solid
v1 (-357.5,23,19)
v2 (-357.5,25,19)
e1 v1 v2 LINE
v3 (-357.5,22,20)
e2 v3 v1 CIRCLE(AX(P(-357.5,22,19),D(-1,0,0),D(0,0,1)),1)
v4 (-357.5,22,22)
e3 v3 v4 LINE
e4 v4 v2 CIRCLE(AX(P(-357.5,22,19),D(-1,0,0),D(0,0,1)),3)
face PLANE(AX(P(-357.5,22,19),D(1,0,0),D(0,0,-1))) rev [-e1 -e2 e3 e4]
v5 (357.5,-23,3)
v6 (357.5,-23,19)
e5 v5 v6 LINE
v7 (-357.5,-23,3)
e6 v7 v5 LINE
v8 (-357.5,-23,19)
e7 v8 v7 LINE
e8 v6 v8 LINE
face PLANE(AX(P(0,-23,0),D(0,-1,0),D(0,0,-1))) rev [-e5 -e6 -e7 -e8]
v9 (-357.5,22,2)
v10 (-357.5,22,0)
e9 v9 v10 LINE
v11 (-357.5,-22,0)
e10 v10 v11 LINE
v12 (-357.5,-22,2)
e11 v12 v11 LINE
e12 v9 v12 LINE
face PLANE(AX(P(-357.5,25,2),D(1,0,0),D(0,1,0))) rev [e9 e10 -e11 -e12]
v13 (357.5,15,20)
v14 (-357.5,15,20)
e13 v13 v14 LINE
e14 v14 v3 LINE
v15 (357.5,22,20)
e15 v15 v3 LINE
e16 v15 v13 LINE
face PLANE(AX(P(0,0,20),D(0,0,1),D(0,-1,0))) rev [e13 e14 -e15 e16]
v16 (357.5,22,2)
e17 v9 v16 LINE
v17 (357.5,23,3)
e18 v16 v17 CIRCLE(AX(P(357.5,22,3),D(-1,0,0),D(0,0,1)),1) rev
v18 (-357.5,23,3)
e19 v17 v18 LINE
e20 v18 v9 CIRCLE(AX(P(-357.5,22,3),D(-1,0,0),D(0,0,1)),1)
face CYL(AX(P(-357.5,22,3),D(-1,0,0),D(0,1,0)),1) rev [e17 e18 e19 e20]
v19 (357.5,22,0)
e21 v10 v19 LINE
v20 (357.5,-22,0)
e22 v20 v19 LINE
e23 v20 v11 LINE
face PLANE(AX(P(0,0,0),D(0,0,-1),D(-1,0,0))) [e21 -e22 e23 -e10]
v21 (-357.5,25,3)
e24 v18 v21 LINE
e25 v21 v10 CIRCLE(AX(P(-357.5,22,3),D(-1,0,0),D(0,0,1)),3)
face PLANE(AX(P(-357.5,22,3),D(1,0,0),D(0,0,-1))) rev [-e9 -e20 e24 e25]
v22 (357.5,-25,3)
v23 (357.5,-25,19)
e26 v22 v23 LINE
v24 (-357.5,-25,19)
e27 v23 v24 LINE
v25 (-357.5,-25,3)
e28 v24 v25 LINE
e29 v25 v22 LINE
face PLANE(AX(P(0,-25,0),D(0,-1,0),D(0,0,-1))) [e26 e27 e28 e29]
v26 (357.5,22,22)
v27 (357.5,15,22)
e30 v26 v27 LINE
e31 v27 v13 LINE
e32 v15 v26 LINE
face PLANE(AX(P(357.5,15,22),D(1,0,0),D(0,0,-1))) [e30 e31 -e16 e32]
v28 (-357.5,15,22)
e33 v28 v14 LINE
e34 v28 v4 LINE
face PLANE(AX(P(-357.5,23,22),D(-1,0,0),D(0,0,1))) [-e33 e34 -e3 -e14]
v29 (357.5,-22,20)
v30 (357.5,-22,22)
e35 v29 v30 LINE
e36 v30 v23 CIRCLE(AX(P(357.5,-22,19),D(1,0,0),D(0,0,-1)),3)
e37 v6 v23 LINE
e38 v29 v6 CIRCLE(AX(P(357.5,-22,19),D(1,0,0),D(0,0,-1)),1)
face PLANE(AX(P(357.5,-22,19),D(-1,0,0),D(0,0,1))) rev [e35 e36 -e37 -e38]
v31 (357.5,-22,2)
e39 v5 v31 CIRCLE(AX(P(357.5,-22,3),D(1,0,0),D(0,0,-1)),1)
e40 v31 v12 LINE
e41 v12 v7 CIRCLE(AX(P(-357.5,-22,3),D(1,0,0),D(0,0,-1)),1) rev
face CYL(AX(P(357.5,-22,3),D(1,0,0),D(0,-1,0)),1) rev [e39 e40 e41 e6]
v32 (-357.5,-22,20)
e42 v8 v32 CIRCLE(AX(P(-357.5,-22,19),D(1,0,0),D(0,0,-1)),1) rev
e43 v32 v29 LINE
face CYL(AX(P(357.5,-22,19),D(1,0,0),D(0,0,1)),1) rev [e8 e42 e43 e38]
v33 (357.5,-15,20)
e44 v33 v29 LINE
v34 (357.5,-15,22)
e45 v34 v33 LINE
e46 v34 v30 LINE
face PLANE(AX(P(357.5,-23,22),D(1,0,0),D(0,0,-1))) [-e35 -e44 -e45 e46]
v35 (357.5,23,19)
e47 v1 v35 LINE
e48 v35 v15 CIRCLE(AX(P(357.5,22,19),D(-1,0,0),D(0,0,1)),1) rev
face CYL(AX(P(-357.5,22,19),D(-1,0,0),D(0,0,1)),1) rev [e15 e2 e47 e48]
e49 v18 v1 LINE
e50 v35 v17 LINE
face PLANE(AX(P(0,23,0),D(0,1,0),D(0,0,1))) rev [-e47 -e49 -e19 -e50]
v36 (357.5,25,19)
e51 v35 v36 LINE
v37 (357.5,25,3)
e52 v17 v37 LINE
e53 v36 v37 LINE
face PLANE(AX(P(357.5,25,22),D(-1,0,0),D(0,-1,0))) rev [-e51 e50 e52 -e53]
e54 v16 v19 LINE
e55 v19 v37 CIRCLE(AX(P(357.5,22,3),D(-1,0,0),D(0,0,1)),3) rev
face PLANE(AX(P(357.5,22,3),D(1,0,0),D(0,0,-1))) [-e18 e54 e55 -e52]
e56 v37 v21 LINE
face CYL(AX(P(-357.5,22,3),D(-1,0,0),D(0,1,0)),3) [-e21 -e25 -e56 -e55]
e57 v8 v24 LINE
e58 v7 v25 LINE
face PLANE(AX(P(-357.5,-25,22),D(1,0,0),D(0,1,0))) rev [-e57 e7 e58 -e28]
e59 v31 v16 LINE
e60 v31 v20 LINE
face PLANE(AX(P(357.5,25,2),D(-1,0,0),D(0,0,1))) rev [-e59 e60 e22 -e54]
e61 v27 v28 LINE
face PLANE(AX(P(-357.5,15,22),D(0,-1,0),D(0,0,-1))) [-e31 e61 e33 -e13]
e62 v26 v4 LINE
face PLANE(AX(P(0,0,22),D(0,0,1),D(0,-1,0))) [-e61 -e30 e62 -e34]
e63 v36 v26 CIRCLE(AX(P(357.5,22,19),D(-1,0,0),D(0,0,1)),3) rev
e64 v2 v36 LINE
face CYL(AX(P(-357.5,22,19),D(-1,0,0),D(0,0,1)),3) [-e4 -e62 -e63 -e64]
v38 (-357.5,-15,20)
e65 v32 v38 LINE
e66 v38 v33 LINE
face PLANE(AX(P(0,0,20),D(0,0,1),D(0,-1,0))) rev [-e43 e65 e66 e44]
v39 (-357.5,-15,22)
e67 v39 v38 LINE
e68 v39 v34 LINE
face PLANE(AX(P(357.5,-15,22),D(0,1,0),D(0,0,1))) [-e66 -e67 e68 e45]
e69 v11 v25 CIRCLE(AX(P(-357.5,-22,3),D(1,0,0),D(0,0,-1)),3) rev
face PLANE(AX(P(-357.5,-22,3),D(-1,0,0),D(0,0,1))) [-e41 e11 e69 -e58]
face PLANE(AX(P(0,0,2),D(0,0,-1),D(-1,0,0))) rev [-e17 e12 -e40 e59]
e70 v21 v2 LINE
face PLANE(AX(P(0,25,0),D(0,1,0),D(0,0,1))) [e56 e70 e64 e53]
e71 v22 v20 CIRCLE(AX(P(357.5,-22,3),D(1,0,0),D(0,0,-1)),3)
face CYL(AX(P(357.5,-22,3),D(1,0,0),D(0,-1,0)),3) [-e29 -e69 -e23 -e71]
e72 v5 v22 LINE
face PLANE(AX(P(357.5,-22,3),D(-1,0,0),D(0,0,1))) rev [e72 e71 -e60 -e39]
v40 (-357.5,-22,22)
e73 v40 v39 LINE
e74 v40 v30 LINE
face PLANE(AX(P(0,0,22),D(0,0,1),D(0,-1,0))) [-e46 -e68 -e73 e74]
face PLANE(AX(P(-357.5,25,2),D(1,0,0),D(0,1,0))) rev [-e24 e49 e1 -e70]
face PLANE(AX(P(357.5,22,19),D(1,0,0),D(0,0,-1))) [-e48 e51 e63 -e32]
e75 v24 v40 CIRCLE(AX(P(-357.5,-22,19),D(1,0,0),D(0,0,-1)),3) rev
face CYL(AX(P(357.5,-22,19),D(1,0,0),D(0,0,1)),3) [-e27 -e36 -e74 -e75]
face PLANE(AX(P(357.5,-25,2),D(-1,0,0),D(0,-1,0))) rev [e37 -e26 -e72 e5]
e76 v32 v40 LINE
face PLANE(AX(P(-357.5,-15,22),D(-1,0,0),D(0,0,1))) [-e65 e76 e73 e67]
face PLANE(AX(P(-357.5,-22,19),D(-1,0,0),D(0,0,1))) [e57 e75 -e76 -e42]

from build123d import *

# Parameters (mm, degrees)
BASEFLANGE_W                   = 715
BASEFLANGE_H                   = 50
BASE_FLANGE1_DEPTH             = 2
EDGE_FLANGE1_STRIP_W           = 10
EDGE_FLANGE1_STRIP_H           = 2
EDGE_FLANGE1_STRIP_CUT_DEPTH   = 715
EDGE_FLANGE1_STRIP_2_W         = 10
EDGE_FLANGE1_STRIP_2_H         = 2
EDGE_FLANGE1_STRIP_CUT_2_DEPTH = 715
EDGE_FLANGE1_DEPTH             = 715
EDGE_FLANGE1_BEND_DEPTH        = 715
EDGE_FLANGE2_STRIP_W           = 10
EDGE_FLANGE2_STRIP_H           = 2
EDGE_FLANGE2_STRIP_CUT_DEPTH   = 715
EDGE_FLANGE2_STRIP_2_W         = 10
EDGE_FLANGE2_STRIP_2_H         = 2
EDGE_FLANGE2_STRIP_CUT_2_DEPTH = 715
EDGE_FLANGE2_DEPTH             = 715
EDGE_FLANGE2_BEND_DEPTH        = 715


# Sheet-metal steps are written as plain solids
with BuildPart() as part:
    # BaseFlange → Base-Flange1 (new body)
    with BuildSketch(Plane.XY):
        Rectangle(BASEFLANGE_W, BASEFLANGE_H)
    extrude(amount=BASE_FLANGE1_DEPTH)

    # Edge-Flange1 strip (across the edge) → Edge-Flange1 strip cut (cut)
    with BuildSketch(Plane(origin=(357.5, 25, 2), x_dir=(0, -1, 0), z_dir=(-1, 0, 0))):
        with Locations((-2, -1)):
            Rectangle(EDGE_FLANGE1_STRIP_W, EDGE_FLANGE1_STRIP_H)
    extrude(amount=EDGE_FLANGE1_STRIP_CUT_DEPTH, mode=Mode.SUBTRACT)

    # Edge-Flange1 strip 2 (across the edge) → Edge-Flange1 strip cut 2 (cut)
    with BuildSketch(Plane(origin=(-357.5, -25, 2), x_dir=(0, 1, 0), z_dir=(1, 0, 0))):
        with Locations((-2, -1)):
            Rectangle(EDGE_FLANGE1_STRIP_2_W, EDGE_FLANGE1_STRIP_2_H)
    extrude(amount=EDGE_FLANGE1_STRIP_CUT_2_DEPTH, mode=Mode.SUBTRACT)

    # Edge-Flange1 section (across the edge) → Edge-Flange1 (add)
    with BuildSketch(Plane(origin=(357.5, 25, 2), x_dir=(0, -1, 0), z_dir=(-1, 0, 0))):
        with BuildLine():
            Line((0, 1), (0, 20))
            Line((0, 20), (2, 20))
            Line((2, 20), (2, 1))
            ThreePointArc((2, 1), (2.292893219, 0.292893219), (3, 0))
            Line((3, 0), (3, -2))
            ThreePointArc((3, -2), (0.878679656, -1.121320344), (0, 1))
        make_face()
    extrude(amount=EDGE_FLANGE1_DEPTH)

    # Edge-Flange1 section 2 (across the edge) → Edge-Flange1 bend (add)
    with BuildSketch(Plane(origin=(-357.5, -25, 2), x_dir=(0, 1, 0), z_dir=(1, 0, 0))):
        with BuildLine():
            Line((0, 1), (0, 20))
            Line((0, 20), (2, 20))
            Line((2, 20), (2, 1))
            ThreePointArc((2, 1), (2.292893219, 0.292893219), (3, 0))
            Line((3, 0), (3, -2))
            ThreePointArc((3, -2), (0.878679656, -1.121320344), (0, 1))
        make_face()
    extrude(amount=EDGE_FLANGE1_BEND_DEPTH)

    # Edge-Flange2 strip (across the edge) → Edge-Flange2 strip cut (cut)
    with BuildSketch(Plane(origin=(357.5, 23, 22), x_dir=(0, 0, -1), z_dir=(-1, 0, 0))):
        with Locations((-2, -1)):
            Rectangle(EDGE_FLANGE2_STRIP_W, EDGE_FLANGE2_STRIP_H)
    extrude(amount=EDGE_FLANGE2_STRIP_CUT_DEPTH, mode=Mode.SUBTRACT)

    # Edge-Flange2 strip 2 (across the edge) → Edge-Flange2 strip cut 2 (cut)
    with BuildSketch(Plane(origin=(-357.5, -23, 22), x_dir=(0, 0, -1), z_dir=(1, 0, 0))):
        with Locations((-2, -1)):
            Rectangle(EDGE_FLANGE2_STRIP_2_W, EDGE_FLANGE2_STRIP_2_H)
    extrude(amount=EDGE_FLANGE2_STRIP_CUT_2_DEPTH, mode=Mode.SUBTRACT)

    # Edge-Flange2 section (across the edge) → Edge-Flange2 (add)
    with BuildSketch(Plane(origin=(357.5, 23, 22), x_dir=(0, 0, -1), z_dir=(-1, 0, 0))):
        with BuildLine():
            Line((0, 1), (0, 8))
            Line((0, 8), (2, 8))
            Line((2, 8), (2, 1))
            ThreePointArc((2, 1), (2.292893219, 0.292893219), (3, 0))
            Line((3, 0), (3, -2))
            ThreePointArc((3, -2), (0.878679656, -1.121320344), (0, 1))
        make_face()
    extrude(amount=EDGE_FLANGE2_DEPTH)

    # Edge-Flange2 section 2 (across the edge) → Edge-Flange2 bend (add)
    with BuildSketch(Plane(origin=(-357.5, -23, 22), x_dir=(0, 0, -1), z_dir=(1, 0, 0))):
        with BuildLine():
            Line((0, 1), (0, 8))
            Line((0, 8), (2, 8))
            Line((2, 8), (2, 1))
            ThreePointArc((2, 1), (2.292893219, 0.292893219), (3, 0))
            Line((3, 0), (3, -2))
            ThreePointArc((3, -2), (0.878679656, -1.121320344), (0, 1))
        make_face()
    extrude(amount=EDGE_FLANGE2_BEND_DEPTH)


solid = part.part
